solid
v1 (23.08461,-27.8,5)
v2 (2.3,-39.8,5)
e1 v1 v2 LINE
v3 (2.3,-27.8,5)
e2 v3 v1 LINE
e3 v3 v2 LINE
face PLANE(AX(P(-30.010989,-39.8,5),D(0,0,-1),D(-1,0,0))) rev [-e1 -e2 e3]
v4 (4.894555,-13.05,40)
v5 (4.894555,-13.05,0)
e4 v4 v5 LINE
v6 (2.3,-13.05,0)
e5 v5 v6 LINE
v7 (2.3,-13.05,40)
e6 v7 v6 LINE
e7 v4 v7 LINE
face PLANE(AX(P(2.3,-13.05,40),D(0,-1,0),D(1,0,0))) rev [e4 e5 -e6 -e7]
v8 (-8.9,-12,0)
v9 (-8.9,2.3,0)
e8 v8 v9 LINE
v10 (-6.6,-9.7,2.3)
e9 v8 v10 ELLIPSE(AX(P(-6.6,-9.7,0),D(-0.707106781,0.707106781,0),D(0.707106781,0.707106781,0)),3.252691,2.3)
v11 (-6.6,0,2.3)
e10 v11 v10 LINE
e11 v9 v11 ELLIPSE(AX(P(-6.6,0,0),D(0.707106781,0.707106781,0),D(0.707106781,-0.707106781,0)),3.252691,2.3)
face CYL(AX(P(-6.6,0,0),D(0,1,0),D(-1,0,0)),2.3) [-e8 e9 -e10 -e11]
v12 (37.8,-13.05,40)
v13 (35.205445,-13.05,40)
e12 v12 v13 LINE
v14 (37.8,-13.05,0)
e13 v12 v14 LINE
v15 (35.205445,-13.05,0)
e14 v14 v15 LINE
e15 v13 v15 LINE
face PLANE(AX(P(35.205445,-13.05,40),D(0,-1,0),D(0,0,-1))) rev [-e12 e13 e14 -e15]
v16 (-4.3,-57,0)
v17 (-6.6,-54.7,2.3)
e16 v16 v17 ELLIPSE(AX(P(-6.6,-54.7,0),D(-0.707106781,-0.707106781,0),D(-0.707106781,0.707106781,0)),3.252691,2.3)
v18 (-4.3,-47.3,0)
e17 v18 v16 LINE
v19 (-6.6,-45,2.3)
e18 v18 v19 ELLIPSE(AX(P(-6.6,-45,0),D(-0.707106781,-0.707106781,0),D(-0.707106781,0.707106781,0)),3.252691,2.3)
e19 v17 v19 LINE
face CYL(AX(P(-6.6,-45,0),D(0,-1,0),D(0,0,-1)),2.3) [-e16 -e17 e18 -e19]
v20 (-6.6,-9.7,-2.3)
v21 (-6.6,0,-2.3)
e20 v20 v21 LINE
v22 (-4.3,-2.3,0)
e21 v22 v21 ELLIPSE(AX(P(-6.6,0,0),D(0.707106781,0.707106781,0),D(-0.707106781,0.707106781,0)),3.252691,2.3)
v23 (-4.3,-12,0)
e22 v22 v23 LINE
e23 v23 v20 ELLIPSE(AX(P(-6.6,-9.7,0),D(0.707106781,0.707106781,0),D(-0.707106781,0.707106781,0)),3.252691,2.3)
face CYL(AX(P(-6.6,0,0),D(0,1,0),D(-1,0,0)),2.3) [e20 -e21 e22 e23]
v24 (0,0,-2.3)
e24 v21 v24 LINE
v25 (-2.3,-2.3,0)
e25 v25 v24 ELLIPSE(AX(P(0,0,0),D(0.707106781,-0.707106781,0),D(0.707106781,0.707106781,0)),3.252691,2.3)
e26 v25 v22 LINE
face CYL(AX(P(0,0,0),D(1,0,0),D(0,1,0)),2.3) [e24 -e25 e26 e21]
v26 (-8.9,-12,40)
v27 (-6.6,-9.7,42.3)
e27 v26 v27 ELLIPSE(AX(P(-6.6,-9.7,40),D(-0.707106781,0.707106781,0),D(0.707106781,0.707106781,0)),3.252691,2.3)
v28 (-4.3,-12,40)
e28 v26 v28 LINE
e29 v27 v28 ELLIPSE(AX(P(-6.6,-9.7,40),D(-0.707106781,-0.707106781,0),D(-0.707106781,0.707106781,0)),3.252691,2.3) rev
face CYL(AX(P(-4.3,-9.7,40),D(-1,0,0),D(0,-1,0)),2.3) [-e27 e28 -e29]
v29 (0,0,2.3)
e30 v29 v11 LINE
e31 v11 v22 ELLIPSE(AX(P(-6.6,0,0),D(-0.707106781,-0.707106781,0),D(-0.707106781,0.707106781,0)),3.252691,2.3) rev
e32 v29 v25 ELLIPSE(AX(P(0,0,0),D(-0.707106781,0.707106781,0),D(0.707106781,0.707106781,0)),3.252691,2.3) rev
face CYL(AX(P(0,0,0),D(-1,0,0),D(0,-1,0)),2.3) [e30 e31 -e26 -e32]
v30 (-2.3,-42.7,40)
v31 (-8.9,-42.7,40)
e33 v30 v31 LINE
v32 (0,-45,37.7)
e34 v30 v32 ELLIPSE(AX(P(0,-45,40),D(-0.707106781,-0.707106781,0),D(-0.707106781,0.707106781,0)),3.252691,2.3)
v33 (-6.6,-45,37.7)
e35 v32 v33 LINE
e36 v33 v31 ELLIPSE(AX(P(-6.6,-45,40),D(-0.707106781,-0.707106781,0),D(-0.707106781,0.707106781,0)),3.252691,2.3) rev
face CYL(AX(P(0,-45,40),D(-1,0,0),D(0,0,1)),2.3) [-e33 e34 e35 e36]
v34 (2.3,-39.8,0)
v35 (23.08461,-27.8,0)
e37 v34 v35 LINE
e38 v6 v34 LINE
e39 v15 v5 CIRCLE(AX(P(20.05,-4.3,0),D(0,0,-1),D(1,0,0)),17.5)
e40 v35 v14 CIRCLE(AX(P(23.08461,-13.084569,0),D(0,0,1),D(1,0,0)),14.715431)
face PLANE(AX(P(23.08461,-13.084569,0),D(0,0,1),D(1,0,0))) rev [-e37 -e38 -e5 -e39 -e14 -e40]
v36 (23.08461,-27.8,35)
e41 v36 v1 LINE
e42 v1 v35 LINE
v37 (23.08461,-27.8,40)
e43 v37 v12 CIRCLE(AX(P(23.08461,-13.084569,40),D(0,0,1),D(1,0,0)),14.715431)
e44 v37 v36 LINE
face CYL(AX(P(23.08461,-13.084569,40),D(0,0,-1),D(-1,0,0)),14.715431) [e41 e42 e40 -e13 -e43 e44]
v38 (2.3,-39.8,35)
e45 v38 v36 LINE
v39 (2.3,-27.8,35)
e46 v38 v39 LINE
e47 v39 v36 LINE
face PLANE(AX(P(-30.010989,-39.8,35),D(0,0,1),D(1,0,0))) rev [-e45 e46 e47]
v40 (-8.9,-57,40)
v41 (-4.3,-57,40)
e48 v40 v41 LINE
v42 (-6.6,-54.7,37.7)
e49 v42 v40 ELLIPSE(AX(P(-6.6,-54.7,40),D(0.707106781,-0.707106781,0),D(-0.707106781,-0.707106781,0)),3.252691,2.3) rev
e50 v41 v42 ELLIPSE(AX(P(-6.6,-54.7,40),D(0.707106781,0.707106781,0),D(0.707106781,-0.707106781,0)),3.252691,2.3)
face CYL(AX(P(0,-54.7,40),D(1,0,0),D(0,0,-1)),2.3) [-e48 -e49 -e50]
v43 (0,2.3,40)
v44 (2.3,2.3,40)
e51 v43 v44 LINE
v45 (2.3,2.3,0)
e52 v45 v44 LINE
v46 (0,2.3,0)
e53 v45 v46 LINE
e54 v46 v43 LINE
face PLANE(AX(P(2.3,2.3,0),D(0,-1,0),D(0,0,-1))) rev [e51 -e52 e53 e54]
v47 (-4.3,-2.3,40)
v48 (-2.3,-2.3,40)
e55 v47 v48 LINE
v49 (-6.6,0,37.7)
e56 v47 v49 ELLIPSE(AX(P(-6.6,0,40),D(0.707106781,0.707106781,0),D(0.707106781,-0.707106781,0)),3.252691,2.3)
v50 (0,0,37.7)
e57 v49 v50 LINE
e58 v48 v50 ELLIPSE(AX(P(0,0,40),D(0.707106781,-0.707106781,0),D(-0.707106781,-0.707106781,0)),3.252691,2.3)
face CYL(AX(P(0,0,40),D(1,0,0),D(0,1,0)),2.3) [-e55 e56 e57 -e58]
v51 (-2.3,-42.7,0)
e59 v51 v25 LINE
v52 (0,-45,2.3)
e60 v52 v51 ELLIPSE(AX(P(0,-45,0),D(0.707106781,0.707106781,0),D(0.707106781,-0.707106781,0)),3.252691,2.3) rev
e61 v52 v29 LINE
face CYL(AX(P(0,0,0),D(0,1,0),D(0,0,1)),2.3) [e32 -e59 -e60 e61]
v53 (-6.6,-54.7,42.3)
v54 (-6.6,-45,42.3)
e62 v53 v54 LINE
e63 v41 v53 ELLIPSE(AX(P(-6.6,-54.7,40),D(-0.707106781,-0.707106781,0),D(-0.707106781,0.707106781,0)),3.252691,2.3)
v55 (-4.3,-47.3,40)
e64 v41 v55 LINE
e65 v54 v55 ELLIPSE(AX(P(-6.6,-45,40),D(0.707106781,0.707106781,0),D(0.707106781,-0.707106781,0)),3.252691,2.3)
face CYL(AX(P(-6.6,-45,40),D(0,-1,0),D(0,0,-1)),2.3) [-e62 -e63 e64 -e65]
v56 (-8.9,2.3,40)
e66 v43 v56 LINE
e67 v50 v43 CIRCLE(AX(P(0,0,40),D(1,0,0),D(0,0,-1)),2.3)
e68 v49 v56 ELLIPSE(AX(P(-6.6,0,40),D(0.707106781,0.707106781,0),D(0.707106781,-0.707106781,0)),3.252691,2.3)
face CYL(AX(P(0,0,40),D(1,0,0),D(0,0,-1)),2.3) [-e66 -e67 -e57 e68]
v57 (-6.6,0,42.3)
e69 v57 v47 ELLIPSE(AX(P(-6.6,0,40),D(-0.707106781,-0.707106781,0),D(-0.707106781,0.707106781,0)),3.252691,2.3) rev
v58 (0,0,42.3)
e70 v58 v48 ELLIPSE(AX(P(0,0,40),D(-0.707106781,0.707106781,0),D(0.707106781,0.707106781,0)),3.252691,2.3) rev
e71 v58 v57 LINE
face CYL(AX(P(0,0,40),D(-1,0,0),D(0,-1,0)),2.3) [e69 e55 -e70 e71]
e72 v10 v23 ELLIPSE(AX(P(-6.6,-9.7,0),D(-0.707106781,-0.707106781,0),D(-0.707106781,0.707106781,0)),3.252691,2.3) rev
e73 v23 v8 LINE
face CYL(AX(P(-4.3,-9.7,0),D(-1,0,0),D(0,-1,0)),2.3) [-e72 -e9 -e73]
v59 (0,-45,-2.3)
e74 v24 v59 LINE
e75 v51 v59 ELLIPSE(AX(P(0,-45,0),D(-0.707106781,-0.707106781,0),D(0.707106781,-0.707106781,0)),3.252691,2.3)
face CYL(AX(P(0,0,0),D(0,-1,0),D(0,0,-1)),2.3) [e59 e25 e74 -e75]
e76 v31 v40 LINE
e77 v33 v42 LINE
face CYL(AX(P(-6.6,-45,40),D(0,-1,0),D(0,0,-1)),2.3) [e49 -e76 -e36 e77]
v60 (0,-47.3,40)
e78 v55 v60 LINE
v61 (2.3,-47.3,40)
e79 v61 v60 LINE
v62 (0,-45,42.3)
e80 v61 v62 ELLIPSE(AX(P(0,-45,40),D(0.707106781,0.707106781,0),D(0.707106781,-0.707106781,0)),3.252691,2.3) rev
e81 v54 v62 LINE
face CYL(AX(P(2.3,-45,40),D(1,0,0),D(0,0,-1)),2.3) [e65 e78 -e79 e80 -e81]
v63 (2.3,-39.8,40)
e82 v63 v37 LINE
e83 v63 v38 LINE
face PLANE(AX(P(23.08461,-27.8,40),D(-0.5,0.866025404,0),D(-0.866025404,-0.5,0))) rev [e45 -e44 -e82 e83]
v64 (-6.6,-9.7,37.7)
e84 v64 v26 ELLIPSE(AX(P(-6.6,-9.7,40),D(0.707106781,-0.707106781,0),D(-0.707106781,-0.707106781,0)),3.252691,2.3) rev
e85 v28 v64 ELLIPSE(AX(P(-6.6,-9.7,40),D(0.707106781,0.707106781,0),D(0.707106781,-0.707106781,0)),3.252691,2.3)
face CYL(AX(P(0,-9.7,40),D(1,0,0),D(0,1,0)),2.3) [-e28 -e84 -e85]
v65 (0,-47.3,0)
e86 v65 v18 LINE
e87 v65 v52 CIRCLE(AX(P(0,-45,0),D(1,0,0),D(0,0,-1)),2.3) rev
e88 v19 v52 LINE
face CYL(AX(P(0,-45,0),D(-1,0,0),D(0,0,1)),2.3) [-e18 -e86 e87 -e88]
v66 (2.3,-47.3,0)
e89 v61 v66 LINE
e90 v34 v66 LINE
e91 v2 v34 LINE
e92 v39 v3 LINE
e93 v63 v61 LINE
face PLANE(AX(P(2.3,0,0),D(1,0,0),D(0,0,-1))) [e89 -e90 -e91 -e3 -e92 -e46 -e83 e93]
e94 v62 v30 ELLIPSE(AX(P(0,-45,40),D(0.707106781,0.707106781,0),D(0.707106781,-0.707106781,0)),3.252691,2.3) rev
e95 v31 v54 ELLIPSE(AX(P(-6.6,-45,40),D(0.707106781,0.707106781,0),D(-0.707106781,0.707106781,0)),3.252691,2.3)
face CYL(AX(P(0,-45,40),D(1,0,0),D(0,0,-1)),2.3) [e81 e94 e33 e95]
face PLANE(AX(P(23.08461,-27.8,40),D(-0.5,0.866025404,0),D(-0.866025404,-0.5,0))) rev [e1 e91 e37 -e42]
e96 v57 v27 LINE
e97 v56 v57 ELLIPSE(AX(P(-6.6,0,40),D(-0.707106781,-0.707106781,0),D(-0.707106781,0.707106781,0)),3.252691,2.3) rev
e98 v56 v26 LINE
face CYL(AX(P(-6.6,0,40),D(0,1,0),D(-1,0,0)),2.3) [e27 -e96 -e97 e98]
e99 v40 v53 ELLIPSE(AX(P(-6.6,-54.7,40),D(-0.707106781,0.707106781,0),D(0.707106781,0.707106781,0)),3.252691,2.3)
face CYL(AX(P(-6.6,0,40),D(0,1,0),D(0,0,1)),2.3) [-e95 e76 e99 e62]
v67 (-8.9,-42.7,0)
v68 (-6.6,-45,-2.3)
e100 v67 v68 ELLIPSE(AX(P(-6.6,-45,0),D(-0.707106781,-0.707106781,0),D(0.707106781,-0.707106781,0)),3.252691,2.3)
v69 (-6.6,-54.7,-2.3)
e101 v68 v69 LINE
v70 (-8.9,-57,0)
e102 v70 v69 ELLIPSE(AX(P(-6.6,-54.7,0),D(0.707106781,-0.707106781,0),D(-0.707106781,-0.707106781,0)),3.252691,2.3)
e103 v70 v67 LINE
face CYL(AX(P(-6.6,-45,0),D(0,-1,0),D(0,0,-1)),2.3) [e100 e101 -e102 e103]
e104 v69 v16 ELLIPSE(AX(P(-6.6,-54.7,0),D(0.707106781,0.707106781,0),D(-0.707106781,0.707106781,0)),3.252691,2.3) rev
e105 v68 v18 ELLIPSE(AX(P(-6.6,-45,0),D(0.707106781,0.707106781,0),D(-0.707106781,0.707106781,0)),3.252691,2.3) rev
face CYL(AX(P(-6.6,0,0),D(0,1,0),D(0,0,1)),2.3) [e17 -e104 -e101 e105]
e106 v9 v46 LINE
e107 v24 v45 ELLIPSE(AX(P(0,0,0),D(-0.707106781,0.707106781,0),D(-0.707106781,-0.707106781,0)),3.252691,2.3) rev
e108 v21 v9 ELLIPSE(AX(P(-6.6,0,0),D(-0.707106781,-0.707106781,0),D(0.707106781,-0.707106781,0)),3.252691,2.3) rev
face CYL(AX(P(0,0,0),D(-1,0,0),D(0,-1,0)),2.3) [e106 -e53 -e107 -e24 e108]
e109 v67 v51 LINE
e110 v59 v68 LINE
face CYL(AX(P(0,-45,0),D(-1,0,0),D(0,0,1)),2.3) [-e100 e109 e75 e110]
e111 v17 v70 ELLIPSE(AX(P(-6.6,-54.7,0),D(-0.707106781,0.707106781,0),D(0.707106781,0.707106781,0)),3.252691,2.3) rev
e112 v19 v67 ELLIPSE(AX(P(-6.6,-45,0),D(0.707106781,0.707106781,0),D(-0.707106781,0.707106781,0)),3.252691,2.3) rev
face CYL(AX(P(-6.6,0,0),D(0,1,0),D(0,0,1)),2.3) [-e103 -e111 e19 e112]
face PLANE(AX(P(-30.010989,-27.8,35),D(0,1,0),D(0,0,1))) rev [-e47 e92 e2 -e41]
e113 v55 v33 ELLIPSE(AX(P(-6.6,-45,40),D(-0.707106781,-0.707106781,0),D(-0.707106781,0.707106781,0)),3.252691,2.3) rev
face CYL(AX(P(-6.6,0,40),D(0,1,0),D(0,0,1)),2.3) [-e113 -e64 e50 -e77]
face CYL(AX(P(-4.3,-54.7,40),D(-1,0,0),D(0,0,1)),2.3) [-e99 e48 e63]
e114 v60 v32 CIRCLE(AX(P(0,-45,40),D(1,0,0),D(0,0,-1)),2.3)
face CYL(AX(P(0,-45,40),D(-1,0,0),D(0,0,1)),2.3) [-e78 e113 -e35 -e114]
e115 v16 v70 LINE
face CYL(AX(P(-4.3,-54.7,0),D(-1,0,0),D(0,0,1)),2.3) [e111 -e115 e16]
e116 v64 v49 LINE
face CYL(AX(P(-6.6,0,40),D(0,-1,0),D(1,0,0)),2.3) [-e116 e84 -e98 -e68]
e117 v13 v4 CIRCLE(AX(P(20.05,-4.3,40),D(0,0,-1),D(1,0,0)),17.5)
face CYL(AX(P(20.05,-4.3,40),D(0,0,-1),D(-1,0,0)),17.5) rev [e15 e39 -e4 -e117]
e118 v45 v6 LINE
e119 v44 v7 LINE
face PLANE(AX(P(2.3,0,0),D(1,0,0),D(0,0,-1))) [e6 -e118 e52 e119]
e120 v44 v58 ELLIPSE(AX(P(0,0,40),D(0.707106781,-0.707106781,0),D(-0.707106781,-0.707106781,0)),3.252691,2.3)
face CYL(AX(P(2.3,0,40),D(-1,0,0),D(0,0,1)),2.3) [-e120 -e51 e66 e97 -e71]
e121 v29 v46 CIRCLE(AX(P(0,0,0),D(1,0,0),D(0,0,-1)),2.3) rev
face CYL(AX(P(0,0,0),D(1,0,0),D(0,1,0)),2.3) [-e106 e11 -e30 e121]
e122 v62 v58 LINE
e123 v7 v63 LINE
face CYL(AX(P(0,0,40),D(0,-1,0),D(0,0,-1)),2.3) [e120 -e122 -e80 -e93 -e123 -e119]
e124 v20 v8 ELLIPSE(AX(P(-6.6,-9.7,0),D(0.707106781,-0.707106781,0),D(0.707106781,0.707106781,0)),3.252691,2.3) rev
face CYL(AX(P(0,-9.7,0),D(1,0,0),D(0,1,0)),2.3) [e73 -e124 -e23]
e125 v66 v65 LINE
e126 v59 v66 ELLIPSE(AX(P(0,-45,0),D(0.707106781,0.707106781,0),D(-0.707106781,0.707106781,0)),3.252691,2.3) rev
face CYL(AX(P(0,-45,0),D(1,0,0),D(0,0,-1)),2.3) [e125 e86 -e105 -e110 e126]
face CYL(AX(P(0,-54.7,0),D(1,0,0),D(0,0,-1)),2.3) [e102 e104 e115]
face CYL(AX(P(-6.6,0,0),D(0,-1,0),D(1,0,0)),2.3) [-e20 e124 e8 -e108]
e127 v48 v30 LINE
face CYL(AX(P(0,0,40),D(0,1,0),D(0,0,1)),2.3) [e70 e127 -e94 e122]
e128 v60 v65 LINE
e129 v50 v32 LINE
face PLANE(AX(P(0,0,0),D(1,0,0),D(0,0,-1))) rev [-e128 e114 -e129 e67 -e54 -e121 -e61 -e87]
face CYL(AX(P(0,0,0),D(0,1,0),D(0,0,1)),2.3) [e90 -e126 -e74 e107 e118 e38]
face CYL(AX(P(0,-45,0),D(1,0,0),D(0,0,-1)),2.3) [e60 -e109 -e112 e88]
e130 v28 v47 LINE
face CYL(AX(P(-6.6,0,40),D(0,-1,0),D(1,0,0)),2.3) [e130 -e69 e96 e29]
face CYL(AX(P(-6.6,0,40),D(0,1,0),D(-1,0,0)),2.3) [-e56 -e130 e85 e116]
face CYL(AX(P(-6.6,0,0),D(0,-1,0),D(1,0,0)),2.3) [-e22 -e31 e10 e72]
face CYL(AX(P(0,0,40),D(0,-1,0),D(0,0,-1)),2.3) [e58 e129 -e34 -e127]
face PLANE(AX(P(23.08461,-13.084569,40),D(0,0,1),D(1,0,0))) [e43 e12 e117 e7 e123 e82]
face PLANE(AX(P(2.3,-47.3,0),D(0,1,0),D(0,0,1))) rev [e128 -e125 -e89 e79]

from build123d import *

# Parameters (mm, degrees)
EXTRU_MINCE1_DEPTH         = 2.3
CONG_1_R                   = 2.3
ESQUISSE2_W                = 40
ESQUISSE2_H                = 49.6
BOSS_EXTRU_1_DEPTH         = 2.3
R_P_TITION_LIN_AIRE1_COUNT = 2
R_P_TITION_LIN_AIRE1_PITCH = 40
CONG_2_R                   = 2.3
BOSS_EXTRU_2_DEPTH         = 40
ENL_V_START                = 37.8
ESQUISSE4_W                = 30
ESQUISSE4_H                = 12
ENL_V_MAT_EXTRU_1_DEPTH    = 35.5


with BuildPart() as part:
    # Esquisse1 → Extru.-Mince1 (new, symmetric)
    with BuildSketch(Plane.XY):
        Polygon((-4.3, -57), (-4.3, -47.3), (2.3, -47.3), (2.3, 2.3), (-8.9, 2.3), (-8.9, -12), (-4.3, -12), (-4.3, -2.3), (-2.3, -2.3), (-2.3, -42.7), (-8.9, -42.7), (-8.9, -57), align=None)
    extru_mince1 = extrude(amount=EXTRU_MINCE1_DEPTH, both=True)

    # Congé1
    cong_1_edges = [part.edges().sort_by_distance(p)[0] for p in [
        (-6.6, -57, -2.3),
        (-4.3, -52.15, -2.3),
        (-1, -47.3, -2.3),
        (2.3, -22.5, -2.3),
        (-3.3, 2.3, -2.3),
        (-8.9, -4.85, -2.3),
        (-6.6, -12, -2.3),
        (-4.3, -7.15, -2.3),
        (-3.3, -2.3, -2.3),
        (-2.3, -22.5, -2.3),
        (-5.6, -42.7, -2.3),
        (-8.9, -49.85, -2.3),
        (-5.6, -42.7, 2.3),
        (-2.3, -22.5, 2.3),
        (-3.3, -2.3, 2.3),
        (-4.3, -7.15, 2.3),
        (-6.6, -12, 2.3),
        (-8.9, -4.85, 2.3),
        (-3.3, 2.3, 2.3),
        (2.3, -22.5, 2.3),
        (-1, -47.3, 2.3),
        (-4.3, -52.15, 2.3),
        (-6.6, -57, 2.3),
        (-8.9, -49.85, 2.3),
    ]]
    fillet(cong_1_edges, radius=CONG_1_R - 0.0001)  # a hair under: the kernel refuses the full size

    # Esquisse2 → Boss.-Extru.1 (add)
    with BuildSketch(Plane(origin=(0, 0, 0), x_dir=(0, 0, -1), z_dir=(1, 0, 0))):
        with Locations((-20, -22.5)):
            Rectangle(ESQUISSE2_W, ESQUISSE2_H)
    extrude(amount=BOSS_EXTRU_1_DEPTH)

    # Répétition linéaire1: Extru.-Mince1 ×2
    with Locations(*[(0, 0, i * R_P_TITION_LIN_AIRE1_PITCH) for i in range(1, R_P_TITION_LIN_AIRE1_COUNT)]):
        add(extru_mince1)

    # Congé2
    cong_2_edges = [part.edges().sort_by_distance(p)[0] for p in [
        (-5.6, -42.7, 42.3),
        (-2.3, -22.5, 42.3),
        (-3.3, -2.3, 42.3),
        (-4.3, -7.15, 42.3),
        (-6.6, -12, 42.3),
        (-8.9, -4.85, 42.3),
        (-3.3, 2.3, 42.3),
        (2.3, -22.5, 42.3),
        (-6.6, -57, 42.3),
        (-4.3, -52.15, 42.3),
        (-1, -47.3, 42.3),
        (-8.9, -49.85, 42.3),
        (-2.15, -47.3, 37.7),
        (-4.3, -52.15, 37.7),
        (-6.6, -57, 37.7),
        (-8.9, -49.85, 37.7),
        (-5.6, -42.7, 37.7),
        (-2.3, -22.5, 37.7),
        (-3.3, -2.3, 37.7),
        (-4.3, -7.15, 37.7),
        (-6.6, -12, 37.7),
        (-8.9, -4.85, 37.7),
        (-4.45, 2.3, 37.7),
    ]]
    fillet(cong_2_edges, radius=CONG_2_R - 0.0001)  # a hair under: the kernel refuses the full size

    # Esquisse3 → Boss.-Extru.2 (add)
    with BuildSketch(Plane.XY):
        with BuildLine():
            Line((2.3, -39.8), (2.3, -13.05))
            Line((2.3, -13.05), (4.894555434, -13.05))
            ThreePointArc((4.894555434, -13.05), (20.05, -21.8), (35.205444566, -13.05))
            Line((35.205444566, -13.05), (37.8, -13.05))
            ThreePointArc((37.8, -13.05), (33.502205526, -23.477720869), (23.084609691, -27.8))
            Line((23.084609691, -27.8), (2.3, -39.8))
        make_face()
    extrude(amount=BOSS_EXTRU_2_DEPTH)

    # Esquisse4 → Enlèv. mat.-Extru.1 (cut)
    with BuildSketch(Plane(origin=(0, 0, 0), x_dir=(0, 0, -1), z_dir=(1, 0, 0)).offset(ENL_V_START)):
        with Locations((-20, -33.8)):
            Rectangle(ESQUISSE4_W, ESQUISSE4_H)
    extrude(amount=-ENL_V_MAT_EXTRU_1_DEPTH, mode=Mode.SUBTRACT)


solid = part.part
